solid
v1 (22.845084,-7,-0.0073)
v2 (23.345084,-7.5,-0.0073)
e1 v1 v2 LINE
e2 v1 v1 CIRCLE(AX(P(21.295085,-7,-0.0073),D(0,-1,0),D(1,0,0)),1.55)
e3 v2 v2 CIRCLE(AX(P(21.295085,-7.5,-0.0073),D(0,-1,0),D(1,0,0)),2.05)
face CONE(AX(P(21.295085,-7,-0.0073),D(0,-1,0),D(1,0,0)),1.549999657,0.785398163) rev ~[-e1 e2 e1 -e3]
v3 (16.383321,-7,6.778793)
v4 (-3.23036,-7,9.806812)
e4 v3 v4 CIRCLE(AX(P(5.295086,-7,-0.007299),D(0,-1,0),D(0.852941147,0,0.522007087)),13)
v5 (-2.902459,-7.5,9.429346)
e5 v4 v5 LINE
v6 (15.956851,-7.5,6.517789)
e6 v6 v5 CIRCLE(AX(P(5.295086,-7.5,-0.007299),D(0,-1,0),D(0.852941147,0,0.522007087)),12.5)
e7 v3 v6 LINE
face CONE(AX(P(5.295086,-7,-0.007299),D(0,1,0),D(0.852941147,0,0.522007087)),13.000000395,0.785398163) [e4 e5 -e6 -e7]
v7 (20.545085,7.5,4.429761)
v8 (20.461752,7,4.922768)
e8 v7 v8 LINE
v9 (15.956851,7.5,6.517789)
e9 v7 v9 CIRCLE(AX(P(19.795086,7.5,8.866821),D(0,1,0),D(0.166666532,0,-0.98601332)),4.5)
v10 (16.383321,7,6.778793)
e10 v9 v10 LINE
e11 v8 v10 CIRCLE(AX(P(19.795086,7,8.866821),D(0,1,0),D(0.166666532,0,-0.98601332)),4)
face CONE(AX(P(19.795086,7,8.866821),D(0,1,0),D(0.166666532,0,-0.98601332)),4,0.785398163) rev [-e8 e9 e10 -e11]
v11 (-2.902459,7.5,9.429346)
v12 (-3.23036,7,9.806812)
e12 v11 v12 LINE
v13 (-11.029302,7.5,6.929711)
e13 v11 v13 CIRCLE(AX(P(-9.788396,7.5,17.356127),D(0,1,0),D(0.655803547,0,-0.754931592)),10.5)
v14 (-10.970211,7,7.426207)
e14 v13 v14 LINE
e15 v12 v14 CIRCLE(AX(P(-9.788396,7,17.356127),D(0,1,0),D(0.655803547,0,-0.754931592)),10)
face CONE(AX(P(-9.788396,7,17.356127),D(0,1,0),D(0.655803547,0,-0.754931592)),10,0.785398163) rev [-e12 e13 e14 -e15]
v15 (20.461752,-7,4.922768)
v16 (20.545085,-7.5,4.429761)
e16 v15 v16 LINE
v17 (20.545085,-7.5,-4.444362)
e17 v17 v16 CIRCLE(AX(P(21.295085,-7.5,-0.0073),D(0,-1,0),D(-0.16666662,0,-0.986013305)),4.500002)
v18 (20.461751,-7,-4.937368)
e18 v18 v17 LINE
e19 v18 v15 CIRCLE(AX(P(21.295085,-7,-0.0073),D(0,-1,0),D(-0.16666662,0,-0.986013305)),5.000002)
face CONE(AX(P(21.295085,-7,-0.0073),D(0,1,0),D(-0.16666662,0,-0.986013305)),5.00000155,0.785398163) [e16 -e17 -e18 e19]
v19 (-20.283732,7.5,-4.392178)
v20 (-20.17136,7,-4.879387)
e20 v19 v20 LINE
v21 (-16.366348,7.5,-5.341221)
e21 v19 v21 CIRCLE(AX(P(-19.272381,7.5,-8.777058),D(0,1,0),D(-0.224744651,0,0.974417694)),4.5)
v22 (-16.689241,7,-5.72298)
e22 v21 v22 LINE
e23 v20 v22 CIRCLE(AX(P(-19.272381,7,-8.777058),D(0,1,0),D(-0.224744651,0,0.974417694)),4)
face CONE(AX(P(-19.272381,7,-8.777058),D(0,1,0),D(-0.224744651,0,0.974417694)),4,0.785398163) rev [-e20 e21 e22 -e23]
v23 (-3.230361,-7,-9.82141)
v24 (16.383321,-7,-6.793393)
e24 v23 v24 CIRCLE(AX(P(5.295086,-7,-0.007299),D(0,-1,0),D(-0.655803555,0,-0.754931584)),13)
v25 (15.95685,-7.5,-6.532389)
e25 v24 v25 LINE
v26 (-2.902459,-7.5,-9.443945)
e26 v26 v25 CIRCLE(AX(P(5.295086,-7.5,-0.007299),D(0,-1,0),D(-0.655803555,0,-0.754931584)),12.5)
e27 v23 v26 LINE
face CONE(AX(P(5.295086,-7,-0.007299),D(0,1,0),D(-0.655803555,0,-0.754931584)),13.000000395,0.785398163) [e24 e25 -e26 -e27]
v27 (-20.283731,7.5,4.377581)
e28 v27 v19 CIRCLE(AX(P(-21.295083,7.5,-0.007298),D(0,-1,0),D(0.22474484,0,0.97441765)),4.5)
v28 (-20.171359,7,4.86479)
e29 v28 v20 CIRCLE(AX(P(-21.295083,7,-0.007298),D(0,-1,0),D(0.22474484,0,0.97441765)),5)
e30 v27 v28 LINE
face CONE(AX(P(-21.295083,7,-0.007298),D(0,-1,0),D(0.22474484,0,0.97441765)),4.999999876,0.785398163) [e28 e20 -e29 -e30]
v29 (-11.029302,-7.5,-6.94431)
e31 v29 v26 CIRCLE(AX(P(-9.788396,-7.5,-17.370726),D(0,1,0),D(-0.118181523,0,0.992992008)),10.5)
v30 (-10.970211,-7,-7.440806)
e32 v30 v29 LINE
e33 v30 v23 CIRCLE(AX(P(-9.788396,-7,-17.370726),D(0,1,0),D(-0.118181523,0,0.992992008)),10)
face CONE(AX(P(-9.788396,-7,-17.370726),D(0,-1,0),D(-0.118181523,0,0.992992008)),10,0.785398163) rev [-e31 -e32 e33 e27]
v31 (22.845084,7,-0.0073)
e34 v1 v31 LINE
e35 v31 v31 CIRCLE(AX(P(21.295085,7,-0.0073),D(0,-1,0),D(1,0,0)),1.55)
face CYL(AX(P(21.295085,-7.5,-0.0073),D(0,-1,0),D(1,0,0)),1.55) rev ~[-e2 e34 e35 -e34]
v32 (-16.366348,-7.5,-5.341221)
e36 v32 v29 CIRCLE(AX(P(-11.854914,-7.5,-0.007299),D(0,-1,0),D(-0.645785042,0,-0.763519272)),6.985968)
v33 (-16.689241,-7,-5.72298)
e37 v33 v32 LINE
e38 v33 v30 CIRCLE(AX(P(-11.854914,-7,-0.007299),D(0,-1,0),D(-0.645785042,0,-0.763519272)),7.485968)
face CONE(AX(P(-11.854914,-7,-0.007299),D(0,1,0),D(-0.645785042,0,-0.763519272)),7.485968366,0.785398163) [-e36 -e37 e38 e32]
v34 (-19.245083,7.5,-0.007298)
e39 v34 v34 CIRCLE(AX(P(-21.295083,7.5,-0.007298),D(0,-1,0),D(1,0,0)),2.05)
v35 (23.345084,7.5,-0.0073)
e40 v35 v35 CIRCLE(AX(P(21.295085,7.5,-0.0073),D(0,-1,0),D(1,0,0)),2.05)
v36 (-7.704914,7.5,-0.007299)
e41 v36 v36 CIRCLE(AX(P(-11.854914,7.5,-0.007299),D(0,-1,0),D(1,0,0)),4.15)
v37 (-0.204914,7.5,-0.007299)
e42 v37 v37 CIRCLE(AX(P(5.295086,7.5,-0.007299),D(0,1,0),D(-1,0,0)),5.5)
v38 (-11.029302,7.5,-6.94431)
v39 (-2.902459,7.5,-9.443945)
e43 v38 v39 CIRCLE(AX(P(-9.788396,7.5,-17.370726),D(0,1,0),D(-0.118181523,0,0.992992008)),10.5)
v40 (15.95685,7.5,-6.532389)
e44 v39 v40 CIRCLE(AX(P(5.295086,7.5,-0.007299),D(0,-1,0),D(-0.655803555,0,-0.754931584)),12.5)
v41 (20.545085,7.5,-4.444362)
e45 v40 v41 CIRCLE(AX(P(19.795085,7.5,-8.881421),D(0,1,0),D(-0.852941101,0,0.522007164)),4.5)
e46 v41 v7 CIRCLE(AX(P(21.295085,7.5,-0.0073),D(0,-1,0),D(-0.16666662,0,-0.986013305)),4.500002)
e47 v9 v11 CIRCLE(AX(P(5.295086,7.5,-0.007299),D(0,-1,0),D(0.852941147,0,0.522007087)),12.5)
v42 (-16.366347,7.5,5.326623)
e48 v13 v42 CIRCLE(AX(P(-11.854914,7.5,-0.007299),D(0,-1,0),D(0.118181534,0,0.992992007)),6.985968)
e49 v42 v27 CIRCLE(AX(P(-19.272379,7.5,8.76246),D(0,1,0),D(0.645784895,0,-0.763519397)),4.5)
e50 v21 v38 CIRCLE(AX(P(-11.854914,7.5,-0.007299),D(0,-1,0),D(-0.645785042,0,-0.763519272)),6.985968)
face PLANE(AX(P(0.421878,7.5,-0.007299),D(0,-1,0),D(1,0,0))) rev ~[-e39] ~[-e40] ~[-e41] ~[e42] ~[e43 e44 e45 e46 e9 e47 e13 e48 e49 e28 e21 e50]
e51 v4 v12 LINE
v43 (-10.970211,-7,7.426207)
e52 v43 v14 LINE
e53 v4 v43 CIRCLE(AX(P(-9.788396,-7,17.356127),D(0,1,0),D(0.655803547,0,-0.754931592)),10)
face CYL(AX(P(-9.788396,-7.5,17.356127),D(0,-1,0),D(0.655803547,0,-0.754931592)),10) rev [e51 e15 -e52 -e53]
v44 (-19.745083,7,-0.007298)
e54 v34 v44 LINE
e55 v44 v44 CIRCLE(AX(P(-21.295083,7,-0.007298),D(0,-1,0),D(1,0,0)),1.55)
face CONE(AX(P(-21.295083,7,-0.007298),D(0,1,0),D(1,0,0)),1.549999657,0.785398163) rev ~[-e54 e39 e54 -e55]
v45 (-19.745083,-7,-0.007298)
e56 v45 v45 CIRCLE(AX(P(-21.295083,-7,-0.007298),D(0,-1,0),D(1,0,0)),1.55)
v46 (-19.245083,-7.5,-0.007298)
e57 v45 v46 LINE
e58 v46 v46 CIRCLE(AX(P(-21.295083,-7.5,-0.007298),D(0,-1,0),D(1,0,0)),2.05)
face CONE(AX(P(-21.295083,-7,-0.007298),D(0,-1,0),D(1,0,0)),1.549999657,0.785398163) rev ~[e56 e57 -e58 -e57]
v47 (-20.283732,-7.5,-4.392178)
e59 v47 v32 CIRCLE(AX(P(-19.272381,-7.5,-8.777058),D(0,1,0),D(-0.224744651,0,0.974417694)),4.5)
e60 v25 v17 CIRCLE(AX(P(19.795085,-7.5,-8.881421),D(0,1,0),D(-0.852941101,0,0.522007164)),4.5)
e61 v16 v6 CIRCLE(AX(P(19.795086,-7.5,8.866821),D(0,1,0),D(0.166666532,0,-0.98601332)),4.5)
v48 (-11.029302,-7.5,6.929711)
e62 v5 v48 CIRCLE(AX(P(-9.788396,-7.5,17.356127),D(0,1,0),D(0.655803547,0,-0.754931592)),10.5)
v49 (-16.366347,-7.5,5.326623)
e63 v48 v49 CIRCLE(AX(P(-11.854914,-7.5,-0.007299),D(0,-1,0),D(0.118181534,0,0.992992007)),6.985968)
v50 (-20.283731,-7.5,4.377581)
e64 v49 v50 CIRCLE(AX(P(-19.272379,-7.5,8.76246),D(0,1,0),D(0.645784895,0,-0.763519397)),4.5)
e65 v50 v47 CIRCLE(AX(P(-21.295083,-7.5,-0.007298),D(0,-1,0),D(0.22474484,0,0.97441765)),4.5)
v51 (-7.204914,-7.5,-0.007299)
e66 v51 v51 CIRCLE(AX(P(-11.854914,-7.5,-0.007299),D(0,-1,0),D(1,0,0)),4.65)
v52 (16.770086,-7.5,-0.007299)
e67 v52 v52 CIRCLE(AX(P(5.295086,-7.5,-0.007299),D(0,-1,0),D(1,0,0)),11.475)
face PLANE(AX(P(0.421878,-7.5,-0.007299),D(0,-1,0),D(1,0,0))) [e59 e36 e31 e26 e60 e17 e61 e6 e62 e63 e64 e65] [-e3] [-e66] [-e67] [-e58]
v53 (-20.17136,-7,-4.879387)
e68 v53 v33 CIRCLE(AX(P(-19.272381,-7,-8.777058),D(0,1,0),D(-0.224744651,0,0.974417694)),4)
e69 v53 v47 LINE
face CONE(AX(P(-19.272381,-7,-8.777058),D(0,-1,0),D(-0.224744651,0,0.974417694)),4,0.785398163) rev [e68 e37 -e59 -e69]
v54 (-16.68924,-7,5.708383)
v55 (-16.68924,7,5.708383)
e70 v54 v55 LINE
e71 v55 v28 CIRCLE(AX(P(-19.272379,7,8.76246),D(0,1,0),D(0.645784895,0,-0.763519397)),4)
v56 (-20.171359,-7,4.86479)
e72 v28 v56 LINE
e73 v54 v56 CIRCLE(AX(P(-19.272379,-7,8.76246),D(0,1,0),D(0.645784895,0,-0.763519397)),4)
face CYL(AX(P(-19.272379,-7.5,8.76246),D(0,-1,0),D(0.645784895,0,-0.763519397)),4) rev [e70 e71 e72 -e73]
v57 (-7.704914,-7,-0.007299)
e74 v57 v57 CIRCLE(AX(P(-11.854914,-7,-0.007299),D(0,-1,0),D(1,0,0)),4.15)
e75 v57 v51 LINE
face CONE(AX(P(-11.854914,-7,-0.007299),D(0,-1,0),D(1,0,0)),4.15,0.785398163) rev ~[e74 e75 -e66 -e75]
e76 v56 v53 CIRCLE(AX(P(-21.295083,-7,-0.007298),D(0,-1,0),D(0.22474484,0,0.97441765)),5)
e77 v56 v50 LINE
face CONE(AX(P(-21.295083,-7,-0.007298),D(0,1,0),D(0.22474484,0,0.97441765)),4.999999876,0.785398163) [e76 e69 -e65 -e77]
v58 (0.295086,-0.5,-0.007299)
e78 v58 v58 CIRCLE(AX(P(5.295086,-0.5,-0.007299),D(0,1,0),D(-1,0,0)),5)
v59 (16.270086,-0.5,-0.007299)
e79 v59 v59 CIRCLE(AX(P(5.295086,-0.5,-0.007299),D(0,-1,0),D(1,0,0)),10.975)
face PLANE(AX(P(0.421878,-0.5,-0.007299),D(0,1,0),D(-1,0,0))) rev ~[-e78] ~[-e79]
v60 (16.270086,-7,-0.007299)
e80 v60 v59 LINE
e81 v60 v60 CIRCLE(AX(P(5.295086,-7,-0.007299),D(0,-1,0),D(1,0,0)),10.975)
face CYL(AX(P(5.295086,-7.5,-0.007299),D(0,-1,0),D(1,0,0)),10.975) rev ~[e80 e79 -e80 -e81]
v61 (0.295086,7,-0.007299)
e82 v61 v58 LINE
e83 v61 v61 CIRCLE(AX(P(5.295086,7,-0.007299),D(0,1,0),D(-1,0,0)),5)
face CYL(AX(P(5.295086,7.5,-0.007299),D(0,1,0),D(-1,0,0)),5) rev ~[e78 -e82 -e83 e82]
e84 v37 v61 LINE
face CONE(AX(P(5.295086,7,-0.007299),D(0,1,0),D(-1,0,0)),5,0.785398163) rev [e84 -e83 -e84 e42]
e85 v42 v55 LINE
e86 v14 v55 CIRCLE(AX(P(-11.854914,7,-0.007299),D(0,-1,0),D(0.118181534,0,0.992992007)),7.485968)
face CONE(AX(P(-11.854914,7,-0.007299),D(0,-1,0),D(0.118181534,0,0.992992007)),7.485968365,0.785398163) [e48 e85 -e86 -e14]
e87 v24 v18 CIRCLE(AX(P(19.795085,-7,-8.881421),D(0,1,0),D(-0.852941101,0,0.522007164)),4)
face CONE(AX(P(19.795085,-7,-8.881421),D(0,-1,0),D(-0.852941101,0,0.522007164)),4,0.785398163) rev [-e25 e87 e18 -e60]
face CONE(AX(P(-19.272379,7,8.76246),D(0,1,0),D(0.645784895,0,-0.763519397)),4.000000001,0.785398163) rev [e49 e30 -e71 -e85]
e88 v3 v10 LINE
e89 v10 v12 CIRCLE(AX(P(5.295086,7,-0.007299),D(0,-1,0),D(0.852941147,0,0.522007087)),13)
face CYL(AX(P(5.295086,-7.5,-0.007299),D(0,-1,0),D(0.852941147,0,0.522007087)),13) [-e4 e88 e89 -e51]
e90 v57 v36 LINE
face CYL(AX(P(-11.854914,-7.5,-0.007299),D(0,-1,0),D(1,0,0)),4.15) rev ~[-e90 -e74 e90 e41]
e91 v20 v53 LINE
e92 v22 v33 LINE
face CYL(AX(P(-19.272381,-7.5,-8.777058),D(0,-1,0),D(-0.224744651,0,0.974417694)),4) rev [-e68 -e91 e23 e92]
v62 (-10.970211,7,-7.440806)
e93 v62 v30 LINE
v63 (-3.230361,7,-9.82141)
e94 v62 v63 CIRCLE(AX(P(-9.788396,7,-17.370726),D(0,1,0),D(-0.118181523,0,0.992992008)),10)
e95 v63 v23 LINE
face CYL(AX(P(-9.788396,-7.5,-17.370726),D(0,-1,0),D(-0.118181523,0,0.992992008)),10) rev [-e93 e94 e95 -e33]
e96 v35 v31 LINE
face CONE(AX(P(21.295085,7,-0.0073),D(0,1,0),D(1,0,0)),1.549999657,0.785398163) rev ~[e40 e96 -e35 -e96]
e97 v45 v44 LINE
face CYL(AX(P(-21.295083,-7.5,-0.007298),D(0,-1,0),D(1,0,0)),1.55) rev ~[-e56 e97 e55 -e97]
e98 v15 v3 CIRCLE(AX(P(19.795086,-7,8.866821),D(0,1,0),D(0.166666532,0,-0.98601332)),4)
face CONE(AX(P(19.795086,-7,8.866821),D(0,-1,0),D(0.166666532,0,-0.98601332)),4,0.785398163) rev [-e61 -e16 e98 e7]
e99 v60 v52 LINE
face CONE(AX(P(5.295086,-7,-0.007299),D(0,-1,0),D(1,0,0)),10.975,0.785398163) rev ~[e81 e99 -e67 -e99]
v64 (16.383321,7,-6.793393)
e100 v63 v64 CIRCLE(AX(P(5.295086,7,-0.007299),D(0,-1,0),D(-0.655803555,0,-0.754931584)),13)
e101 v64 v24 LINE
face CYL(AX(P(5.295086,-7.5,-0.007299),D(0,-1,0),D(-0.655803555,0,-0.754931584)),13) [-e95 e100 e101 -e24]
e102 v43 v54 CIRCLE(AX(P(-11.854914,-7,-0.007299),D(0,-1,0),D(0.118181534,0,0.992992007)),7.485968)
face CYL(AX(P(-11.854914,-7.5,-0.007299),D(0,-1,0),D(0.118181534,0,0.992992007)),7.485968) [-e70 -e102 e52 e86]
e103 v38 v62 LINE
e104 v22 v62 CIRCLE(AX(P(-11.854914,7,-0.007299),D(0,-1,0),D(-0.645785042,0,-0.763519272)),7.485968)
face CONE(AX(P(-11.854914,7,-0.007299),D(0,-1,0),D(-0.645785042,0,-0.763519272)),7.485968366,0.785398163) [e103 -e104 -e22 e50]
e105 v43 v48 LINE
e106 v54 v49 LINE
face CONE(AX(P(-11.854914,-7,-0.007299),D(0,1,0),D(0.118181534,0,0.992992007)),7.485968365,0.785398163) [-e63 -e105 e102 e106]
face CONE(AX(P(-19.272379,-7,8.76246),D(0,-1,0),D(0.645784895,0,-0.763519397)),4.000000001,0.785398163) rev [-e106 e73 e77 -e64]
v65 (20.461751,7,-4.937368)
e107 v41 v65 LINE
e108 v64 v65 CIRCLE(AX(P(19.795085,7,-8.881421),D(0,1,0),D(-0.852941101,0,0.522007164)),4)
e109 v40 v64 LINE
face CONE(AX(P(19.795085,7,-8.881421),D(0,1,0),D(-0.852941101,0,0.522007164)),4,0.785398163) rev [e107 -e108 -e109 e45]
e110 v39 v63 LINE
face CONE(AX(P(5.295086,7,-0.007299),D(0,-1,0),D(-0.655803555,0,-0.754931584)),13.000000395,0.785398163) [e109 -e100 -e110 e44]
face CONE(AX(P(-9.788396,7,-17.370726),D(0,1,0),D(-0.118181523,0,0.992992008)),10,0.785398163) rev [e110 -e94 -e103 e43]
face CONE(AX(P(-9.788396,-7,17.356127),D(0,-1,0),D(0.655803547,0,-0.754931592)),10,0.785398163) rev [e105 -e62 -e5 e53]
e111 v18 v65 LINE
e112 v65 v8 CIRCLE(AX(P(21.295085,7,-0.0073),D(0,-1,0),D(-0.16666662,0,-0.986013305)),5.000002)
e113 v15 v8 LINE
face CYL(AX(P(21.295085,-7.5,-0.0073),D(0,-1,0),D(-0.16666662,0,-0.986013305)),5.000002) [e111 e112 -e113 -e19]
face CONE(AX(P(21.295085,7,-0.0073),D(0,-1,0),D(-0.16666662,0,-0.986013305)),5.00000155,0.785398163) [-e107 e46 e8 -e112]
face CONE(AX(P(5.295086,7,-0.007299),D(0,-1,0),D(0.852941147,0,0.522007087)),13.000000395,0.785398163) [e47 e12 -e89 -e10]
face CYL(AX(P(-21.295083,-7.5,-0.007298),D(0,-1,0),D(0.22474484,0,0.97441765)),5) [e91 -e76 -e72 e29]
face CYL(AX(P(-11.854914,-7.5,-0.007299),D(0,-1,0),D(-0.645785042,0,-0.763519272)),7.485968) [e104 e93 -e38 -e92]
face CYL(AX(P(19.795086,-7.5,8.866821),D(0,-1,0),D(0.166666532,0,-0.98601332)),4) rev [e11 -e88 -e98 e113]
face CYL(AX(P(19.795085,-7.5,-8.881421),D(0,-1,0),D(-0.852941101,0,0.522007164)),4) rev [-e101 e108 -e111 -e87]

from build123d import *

# Parameters (mm, degrees)
F1_R     = 1.5499996566
F1_R_2   = 4.15
F1_R_3   = 10.975
F2_DEPTH = 15
F3_R     = 1.5499996566
F3_R_2   = 10.975
F3_R_3   = 4.15
F3_R_4   = 5
F4_DEPTH = 8
F5_SIZE  = 0.5


# Not quite as in the source:
# - a feature names something its author has since deleted; it is built from what else it names


with BuildPart() as f2:
    # F1 (on offset) → F2 (new body)
    with BuildSketch(Plane.XZ.offset(7.5)):
        with BuildLine():
            ThreePointArc((-16.6892397333, 5.7083826769), (-18.3305665894, 4.8749174948), (-20.1713586703, 4.8647896648))
            ThreePointArc((-20.1713586703, 4.8647896648), (-26.2950827169, -0.0072979827), (-20.1713596113, -4.879386813))
            ThreePointArc((-20.1713596113, -4.879386813), (-18.3305675322, -4.8895149984), (-16.6892408371, -5.7229804975))
            ThreePointArc((-16.6892408371, -5.7229804975), (-14.008426037, -7.1768258733), (-10.9702112996, -7.4408061354))
            ThreePointArc((-10.9702112996, -7.4408061354), (-6.8485397196, -7.8126278343), (-3.2303605207, -9.8214103693))
            ThreePointArc((-3.2303605207, -9.8214103693), (7.2785660743, -12.855093715), (16.3833205976, -6.7933928076))
            ThreePointArc((16.3833205976, -6.7933928076), (18.1382514389, -5.2406931628), (20.4617514792, -4.9373682419))
            ThreePointArc((20.4617514792, -4.9373682419), (26.2950863861, -0.0073004118), (20.4617519197, 4.9227679396))
            ThreePointArc((20.4617519197, 4.9227679396), (18.1382519066, 5.2260930681), (16.383321204, 6.7787928697))
            ThreePointArc((16.383321204, 6.7787928697), (7.2785667206, 12.8404946682), (-3.2303604104, 9.8068115182))
            ThreePointArc((-3.2303604104, 9.8068115182), (-6.8485396319, 7.7980290238), (-10.970211216, 7.4262073712))
            ThreePointArc((-10.970211216, 7.4262073712), (-14.0084253044, 7.1622273392), (-16.6892397333, 5.7083826769))
        make_face()
        with Locations((21.2950848365, -0.0073001884)):
            Circle(F1_R, mode=Mode.SUBTRACT)
        with Locations((-21.2950828407, -0.0072984656)):
            Circle(F1_R, mode=Mode.SUBTRACT)
        with Locations((-11.8549144411, -0.0072993771)):
            Circle(F1_R_2, mode=Mode.SUBTRACT)
        with Locations((5.2950859535, -0.0072994735)):
            Circle(F1_R_3, mode=Mode.SUBTRACT)
    extrude(amount=-F2_DEPTH)

    # F3 (on face) → F4 (join)
    with BuildSketch(Plane(origin=(0, 7.5, 0), x_dir=(-1, 0, 0), z_dir=(0, 1, 0))):
        with BuildLine():
            ThreePointArc((10.970211216, 7.4262073712), (6.8485396319, 7.7980290238), (3.2303604104, 9.8068115182))
            ThreePointArc((3.2303604104, 9.8068115182), (-7.2785667206, 12.8404946682), (-16.383321204, 6.7787928697))
            ThreePointArc((-16.383321204, 6.7787928697), (-18.1382519066, 5.2260930681), (-20.4617519197, 4.9227679396))
            ThreePointArc((-20.4617519197, 4.9227679396), (-26.2950863861, -0.0073004118), (-20.4617514792, -4.9373682419))
            ThreePointArc((-20.4617514792, -4.9373682419), (-18.1382514389, -5.2406931628), (-16.3833205976, -6.7933928076))
            ThreePointArc((-16.3833205976, -6.7933928076), (-7.2785660743, -12.855093715), (3.2303605207, -9.8214103693))
            ThreePointArc((3.2303605207, -9.8214103693), (6.8485397196, -7.8126278343), (10.9702112996, -7.4408061354))
            ThreePointArc((10.9702112996, -7.4408061354), (14.008426037, -7.1768258733), (16.6892408371, -5.7229804975))
            ThreePointArc((16.6892408371, -5.7229804975), (18.3305675322, -4.8895149984), (20.1713596113, -4.879386813))
            ThreePointArc((20.1713596113, -4.879386813), (26.2950827169, -0.0072979827), (20.1713586703, 4.8647896648))
            ThreePointArc((20.1713586703, 4.8647896648), (18.3305665894, 4.8749174948), (16.6892397333, 5.7083826769))
            ThreePointArc((16.6892397333, 5.7083826769), (14.0084253044, 7.1622273392), (10.970211216, 7.4262073712))
        make_face()
        with Locations((-21.2950848365, -0.0073001884)):
            Circle(F3_R, mode=Mode.SUBTRACT)
        with Locations((-5.2950859535, -0.0072994735)):
            Circle(F3_R_2, mode=Mode.SUBTRACT)
        with Locations((11.8549144411, -0.0072993771)):
            Circle(F3_R_3, mode=Mode.SUBTRACT)
        with Locations((21.2950828407, -0.0072984656)):
            Circle(F3_R, mode=Mode.SUBTRACT)
        with Locations((-5.2950859535, -0.0072994735)):
            Circle(F3_R_2)
        with Locations((-5.2950859535, -0.0072994735)):
            Circle(F3_R_4, mode=Mode.SUBTRACT)
    extrude(amount=-F4_DEPTH)

    # F5
    f5_edges = [f2.edges().sort_by_distance(p)[0] for p in [
        (-6.84854, -7.5, 7.798029),
        (7.278567, -7.5, 12.840495),
        (18.138252, -7.5, 5.226093),
        (26.295086, -7.5, -0.0073),
        (18.138251, -7.5, -5.240693),
        (7.278566, -7.5, -12.855094),
        (-6.84854, -7.5, -7.812628),
        (-14.008426, -7.5, -7.176826),
        (-18.330568, -7.5, -4.889515),
        (-26.295083, -7.5, -0.007298),
        (-18.330567, -7.5, 4.874917),
        (-14.008425, -7.5, 7.162227),
        (-5.679914, -7.5, -0.007299),
        (-22.845082, -7.5, -0.007298),
        (19.745085, -7.5, -0.0073),
        (7.278567, 7.5, 12.840495),
        (-22.845082, 7.5, -0.007298),
        (10.295086, 7.5, -0.007299),
        (19.745085, 7.5, -0.0073),
        (-16.004914, -7.5, -0.007299),
        (-6.84854, 7.5, 7.798029),
        (-14.008425, 7.5, 7.162227),
        (-18.330567, 7.5, 4.874917),
        (-26.295083, 7.5, -0.007298),
        (-18.330568, 7.5, -4.889515),
        (-14.008426, 7.5, -7.176826),
        (-6.84854, 7.5, -7.812628),
        (7.278566, 7.5, -12.855094),
        (18.138251, 7.5, -5.240693),
        (26.295086, 7.5, -0.0073),
        (18.138252, 7.5, 5.226093),
    ]]
    chamfer(f5_edges, length=F5_SIZE)


solid = f2.part
